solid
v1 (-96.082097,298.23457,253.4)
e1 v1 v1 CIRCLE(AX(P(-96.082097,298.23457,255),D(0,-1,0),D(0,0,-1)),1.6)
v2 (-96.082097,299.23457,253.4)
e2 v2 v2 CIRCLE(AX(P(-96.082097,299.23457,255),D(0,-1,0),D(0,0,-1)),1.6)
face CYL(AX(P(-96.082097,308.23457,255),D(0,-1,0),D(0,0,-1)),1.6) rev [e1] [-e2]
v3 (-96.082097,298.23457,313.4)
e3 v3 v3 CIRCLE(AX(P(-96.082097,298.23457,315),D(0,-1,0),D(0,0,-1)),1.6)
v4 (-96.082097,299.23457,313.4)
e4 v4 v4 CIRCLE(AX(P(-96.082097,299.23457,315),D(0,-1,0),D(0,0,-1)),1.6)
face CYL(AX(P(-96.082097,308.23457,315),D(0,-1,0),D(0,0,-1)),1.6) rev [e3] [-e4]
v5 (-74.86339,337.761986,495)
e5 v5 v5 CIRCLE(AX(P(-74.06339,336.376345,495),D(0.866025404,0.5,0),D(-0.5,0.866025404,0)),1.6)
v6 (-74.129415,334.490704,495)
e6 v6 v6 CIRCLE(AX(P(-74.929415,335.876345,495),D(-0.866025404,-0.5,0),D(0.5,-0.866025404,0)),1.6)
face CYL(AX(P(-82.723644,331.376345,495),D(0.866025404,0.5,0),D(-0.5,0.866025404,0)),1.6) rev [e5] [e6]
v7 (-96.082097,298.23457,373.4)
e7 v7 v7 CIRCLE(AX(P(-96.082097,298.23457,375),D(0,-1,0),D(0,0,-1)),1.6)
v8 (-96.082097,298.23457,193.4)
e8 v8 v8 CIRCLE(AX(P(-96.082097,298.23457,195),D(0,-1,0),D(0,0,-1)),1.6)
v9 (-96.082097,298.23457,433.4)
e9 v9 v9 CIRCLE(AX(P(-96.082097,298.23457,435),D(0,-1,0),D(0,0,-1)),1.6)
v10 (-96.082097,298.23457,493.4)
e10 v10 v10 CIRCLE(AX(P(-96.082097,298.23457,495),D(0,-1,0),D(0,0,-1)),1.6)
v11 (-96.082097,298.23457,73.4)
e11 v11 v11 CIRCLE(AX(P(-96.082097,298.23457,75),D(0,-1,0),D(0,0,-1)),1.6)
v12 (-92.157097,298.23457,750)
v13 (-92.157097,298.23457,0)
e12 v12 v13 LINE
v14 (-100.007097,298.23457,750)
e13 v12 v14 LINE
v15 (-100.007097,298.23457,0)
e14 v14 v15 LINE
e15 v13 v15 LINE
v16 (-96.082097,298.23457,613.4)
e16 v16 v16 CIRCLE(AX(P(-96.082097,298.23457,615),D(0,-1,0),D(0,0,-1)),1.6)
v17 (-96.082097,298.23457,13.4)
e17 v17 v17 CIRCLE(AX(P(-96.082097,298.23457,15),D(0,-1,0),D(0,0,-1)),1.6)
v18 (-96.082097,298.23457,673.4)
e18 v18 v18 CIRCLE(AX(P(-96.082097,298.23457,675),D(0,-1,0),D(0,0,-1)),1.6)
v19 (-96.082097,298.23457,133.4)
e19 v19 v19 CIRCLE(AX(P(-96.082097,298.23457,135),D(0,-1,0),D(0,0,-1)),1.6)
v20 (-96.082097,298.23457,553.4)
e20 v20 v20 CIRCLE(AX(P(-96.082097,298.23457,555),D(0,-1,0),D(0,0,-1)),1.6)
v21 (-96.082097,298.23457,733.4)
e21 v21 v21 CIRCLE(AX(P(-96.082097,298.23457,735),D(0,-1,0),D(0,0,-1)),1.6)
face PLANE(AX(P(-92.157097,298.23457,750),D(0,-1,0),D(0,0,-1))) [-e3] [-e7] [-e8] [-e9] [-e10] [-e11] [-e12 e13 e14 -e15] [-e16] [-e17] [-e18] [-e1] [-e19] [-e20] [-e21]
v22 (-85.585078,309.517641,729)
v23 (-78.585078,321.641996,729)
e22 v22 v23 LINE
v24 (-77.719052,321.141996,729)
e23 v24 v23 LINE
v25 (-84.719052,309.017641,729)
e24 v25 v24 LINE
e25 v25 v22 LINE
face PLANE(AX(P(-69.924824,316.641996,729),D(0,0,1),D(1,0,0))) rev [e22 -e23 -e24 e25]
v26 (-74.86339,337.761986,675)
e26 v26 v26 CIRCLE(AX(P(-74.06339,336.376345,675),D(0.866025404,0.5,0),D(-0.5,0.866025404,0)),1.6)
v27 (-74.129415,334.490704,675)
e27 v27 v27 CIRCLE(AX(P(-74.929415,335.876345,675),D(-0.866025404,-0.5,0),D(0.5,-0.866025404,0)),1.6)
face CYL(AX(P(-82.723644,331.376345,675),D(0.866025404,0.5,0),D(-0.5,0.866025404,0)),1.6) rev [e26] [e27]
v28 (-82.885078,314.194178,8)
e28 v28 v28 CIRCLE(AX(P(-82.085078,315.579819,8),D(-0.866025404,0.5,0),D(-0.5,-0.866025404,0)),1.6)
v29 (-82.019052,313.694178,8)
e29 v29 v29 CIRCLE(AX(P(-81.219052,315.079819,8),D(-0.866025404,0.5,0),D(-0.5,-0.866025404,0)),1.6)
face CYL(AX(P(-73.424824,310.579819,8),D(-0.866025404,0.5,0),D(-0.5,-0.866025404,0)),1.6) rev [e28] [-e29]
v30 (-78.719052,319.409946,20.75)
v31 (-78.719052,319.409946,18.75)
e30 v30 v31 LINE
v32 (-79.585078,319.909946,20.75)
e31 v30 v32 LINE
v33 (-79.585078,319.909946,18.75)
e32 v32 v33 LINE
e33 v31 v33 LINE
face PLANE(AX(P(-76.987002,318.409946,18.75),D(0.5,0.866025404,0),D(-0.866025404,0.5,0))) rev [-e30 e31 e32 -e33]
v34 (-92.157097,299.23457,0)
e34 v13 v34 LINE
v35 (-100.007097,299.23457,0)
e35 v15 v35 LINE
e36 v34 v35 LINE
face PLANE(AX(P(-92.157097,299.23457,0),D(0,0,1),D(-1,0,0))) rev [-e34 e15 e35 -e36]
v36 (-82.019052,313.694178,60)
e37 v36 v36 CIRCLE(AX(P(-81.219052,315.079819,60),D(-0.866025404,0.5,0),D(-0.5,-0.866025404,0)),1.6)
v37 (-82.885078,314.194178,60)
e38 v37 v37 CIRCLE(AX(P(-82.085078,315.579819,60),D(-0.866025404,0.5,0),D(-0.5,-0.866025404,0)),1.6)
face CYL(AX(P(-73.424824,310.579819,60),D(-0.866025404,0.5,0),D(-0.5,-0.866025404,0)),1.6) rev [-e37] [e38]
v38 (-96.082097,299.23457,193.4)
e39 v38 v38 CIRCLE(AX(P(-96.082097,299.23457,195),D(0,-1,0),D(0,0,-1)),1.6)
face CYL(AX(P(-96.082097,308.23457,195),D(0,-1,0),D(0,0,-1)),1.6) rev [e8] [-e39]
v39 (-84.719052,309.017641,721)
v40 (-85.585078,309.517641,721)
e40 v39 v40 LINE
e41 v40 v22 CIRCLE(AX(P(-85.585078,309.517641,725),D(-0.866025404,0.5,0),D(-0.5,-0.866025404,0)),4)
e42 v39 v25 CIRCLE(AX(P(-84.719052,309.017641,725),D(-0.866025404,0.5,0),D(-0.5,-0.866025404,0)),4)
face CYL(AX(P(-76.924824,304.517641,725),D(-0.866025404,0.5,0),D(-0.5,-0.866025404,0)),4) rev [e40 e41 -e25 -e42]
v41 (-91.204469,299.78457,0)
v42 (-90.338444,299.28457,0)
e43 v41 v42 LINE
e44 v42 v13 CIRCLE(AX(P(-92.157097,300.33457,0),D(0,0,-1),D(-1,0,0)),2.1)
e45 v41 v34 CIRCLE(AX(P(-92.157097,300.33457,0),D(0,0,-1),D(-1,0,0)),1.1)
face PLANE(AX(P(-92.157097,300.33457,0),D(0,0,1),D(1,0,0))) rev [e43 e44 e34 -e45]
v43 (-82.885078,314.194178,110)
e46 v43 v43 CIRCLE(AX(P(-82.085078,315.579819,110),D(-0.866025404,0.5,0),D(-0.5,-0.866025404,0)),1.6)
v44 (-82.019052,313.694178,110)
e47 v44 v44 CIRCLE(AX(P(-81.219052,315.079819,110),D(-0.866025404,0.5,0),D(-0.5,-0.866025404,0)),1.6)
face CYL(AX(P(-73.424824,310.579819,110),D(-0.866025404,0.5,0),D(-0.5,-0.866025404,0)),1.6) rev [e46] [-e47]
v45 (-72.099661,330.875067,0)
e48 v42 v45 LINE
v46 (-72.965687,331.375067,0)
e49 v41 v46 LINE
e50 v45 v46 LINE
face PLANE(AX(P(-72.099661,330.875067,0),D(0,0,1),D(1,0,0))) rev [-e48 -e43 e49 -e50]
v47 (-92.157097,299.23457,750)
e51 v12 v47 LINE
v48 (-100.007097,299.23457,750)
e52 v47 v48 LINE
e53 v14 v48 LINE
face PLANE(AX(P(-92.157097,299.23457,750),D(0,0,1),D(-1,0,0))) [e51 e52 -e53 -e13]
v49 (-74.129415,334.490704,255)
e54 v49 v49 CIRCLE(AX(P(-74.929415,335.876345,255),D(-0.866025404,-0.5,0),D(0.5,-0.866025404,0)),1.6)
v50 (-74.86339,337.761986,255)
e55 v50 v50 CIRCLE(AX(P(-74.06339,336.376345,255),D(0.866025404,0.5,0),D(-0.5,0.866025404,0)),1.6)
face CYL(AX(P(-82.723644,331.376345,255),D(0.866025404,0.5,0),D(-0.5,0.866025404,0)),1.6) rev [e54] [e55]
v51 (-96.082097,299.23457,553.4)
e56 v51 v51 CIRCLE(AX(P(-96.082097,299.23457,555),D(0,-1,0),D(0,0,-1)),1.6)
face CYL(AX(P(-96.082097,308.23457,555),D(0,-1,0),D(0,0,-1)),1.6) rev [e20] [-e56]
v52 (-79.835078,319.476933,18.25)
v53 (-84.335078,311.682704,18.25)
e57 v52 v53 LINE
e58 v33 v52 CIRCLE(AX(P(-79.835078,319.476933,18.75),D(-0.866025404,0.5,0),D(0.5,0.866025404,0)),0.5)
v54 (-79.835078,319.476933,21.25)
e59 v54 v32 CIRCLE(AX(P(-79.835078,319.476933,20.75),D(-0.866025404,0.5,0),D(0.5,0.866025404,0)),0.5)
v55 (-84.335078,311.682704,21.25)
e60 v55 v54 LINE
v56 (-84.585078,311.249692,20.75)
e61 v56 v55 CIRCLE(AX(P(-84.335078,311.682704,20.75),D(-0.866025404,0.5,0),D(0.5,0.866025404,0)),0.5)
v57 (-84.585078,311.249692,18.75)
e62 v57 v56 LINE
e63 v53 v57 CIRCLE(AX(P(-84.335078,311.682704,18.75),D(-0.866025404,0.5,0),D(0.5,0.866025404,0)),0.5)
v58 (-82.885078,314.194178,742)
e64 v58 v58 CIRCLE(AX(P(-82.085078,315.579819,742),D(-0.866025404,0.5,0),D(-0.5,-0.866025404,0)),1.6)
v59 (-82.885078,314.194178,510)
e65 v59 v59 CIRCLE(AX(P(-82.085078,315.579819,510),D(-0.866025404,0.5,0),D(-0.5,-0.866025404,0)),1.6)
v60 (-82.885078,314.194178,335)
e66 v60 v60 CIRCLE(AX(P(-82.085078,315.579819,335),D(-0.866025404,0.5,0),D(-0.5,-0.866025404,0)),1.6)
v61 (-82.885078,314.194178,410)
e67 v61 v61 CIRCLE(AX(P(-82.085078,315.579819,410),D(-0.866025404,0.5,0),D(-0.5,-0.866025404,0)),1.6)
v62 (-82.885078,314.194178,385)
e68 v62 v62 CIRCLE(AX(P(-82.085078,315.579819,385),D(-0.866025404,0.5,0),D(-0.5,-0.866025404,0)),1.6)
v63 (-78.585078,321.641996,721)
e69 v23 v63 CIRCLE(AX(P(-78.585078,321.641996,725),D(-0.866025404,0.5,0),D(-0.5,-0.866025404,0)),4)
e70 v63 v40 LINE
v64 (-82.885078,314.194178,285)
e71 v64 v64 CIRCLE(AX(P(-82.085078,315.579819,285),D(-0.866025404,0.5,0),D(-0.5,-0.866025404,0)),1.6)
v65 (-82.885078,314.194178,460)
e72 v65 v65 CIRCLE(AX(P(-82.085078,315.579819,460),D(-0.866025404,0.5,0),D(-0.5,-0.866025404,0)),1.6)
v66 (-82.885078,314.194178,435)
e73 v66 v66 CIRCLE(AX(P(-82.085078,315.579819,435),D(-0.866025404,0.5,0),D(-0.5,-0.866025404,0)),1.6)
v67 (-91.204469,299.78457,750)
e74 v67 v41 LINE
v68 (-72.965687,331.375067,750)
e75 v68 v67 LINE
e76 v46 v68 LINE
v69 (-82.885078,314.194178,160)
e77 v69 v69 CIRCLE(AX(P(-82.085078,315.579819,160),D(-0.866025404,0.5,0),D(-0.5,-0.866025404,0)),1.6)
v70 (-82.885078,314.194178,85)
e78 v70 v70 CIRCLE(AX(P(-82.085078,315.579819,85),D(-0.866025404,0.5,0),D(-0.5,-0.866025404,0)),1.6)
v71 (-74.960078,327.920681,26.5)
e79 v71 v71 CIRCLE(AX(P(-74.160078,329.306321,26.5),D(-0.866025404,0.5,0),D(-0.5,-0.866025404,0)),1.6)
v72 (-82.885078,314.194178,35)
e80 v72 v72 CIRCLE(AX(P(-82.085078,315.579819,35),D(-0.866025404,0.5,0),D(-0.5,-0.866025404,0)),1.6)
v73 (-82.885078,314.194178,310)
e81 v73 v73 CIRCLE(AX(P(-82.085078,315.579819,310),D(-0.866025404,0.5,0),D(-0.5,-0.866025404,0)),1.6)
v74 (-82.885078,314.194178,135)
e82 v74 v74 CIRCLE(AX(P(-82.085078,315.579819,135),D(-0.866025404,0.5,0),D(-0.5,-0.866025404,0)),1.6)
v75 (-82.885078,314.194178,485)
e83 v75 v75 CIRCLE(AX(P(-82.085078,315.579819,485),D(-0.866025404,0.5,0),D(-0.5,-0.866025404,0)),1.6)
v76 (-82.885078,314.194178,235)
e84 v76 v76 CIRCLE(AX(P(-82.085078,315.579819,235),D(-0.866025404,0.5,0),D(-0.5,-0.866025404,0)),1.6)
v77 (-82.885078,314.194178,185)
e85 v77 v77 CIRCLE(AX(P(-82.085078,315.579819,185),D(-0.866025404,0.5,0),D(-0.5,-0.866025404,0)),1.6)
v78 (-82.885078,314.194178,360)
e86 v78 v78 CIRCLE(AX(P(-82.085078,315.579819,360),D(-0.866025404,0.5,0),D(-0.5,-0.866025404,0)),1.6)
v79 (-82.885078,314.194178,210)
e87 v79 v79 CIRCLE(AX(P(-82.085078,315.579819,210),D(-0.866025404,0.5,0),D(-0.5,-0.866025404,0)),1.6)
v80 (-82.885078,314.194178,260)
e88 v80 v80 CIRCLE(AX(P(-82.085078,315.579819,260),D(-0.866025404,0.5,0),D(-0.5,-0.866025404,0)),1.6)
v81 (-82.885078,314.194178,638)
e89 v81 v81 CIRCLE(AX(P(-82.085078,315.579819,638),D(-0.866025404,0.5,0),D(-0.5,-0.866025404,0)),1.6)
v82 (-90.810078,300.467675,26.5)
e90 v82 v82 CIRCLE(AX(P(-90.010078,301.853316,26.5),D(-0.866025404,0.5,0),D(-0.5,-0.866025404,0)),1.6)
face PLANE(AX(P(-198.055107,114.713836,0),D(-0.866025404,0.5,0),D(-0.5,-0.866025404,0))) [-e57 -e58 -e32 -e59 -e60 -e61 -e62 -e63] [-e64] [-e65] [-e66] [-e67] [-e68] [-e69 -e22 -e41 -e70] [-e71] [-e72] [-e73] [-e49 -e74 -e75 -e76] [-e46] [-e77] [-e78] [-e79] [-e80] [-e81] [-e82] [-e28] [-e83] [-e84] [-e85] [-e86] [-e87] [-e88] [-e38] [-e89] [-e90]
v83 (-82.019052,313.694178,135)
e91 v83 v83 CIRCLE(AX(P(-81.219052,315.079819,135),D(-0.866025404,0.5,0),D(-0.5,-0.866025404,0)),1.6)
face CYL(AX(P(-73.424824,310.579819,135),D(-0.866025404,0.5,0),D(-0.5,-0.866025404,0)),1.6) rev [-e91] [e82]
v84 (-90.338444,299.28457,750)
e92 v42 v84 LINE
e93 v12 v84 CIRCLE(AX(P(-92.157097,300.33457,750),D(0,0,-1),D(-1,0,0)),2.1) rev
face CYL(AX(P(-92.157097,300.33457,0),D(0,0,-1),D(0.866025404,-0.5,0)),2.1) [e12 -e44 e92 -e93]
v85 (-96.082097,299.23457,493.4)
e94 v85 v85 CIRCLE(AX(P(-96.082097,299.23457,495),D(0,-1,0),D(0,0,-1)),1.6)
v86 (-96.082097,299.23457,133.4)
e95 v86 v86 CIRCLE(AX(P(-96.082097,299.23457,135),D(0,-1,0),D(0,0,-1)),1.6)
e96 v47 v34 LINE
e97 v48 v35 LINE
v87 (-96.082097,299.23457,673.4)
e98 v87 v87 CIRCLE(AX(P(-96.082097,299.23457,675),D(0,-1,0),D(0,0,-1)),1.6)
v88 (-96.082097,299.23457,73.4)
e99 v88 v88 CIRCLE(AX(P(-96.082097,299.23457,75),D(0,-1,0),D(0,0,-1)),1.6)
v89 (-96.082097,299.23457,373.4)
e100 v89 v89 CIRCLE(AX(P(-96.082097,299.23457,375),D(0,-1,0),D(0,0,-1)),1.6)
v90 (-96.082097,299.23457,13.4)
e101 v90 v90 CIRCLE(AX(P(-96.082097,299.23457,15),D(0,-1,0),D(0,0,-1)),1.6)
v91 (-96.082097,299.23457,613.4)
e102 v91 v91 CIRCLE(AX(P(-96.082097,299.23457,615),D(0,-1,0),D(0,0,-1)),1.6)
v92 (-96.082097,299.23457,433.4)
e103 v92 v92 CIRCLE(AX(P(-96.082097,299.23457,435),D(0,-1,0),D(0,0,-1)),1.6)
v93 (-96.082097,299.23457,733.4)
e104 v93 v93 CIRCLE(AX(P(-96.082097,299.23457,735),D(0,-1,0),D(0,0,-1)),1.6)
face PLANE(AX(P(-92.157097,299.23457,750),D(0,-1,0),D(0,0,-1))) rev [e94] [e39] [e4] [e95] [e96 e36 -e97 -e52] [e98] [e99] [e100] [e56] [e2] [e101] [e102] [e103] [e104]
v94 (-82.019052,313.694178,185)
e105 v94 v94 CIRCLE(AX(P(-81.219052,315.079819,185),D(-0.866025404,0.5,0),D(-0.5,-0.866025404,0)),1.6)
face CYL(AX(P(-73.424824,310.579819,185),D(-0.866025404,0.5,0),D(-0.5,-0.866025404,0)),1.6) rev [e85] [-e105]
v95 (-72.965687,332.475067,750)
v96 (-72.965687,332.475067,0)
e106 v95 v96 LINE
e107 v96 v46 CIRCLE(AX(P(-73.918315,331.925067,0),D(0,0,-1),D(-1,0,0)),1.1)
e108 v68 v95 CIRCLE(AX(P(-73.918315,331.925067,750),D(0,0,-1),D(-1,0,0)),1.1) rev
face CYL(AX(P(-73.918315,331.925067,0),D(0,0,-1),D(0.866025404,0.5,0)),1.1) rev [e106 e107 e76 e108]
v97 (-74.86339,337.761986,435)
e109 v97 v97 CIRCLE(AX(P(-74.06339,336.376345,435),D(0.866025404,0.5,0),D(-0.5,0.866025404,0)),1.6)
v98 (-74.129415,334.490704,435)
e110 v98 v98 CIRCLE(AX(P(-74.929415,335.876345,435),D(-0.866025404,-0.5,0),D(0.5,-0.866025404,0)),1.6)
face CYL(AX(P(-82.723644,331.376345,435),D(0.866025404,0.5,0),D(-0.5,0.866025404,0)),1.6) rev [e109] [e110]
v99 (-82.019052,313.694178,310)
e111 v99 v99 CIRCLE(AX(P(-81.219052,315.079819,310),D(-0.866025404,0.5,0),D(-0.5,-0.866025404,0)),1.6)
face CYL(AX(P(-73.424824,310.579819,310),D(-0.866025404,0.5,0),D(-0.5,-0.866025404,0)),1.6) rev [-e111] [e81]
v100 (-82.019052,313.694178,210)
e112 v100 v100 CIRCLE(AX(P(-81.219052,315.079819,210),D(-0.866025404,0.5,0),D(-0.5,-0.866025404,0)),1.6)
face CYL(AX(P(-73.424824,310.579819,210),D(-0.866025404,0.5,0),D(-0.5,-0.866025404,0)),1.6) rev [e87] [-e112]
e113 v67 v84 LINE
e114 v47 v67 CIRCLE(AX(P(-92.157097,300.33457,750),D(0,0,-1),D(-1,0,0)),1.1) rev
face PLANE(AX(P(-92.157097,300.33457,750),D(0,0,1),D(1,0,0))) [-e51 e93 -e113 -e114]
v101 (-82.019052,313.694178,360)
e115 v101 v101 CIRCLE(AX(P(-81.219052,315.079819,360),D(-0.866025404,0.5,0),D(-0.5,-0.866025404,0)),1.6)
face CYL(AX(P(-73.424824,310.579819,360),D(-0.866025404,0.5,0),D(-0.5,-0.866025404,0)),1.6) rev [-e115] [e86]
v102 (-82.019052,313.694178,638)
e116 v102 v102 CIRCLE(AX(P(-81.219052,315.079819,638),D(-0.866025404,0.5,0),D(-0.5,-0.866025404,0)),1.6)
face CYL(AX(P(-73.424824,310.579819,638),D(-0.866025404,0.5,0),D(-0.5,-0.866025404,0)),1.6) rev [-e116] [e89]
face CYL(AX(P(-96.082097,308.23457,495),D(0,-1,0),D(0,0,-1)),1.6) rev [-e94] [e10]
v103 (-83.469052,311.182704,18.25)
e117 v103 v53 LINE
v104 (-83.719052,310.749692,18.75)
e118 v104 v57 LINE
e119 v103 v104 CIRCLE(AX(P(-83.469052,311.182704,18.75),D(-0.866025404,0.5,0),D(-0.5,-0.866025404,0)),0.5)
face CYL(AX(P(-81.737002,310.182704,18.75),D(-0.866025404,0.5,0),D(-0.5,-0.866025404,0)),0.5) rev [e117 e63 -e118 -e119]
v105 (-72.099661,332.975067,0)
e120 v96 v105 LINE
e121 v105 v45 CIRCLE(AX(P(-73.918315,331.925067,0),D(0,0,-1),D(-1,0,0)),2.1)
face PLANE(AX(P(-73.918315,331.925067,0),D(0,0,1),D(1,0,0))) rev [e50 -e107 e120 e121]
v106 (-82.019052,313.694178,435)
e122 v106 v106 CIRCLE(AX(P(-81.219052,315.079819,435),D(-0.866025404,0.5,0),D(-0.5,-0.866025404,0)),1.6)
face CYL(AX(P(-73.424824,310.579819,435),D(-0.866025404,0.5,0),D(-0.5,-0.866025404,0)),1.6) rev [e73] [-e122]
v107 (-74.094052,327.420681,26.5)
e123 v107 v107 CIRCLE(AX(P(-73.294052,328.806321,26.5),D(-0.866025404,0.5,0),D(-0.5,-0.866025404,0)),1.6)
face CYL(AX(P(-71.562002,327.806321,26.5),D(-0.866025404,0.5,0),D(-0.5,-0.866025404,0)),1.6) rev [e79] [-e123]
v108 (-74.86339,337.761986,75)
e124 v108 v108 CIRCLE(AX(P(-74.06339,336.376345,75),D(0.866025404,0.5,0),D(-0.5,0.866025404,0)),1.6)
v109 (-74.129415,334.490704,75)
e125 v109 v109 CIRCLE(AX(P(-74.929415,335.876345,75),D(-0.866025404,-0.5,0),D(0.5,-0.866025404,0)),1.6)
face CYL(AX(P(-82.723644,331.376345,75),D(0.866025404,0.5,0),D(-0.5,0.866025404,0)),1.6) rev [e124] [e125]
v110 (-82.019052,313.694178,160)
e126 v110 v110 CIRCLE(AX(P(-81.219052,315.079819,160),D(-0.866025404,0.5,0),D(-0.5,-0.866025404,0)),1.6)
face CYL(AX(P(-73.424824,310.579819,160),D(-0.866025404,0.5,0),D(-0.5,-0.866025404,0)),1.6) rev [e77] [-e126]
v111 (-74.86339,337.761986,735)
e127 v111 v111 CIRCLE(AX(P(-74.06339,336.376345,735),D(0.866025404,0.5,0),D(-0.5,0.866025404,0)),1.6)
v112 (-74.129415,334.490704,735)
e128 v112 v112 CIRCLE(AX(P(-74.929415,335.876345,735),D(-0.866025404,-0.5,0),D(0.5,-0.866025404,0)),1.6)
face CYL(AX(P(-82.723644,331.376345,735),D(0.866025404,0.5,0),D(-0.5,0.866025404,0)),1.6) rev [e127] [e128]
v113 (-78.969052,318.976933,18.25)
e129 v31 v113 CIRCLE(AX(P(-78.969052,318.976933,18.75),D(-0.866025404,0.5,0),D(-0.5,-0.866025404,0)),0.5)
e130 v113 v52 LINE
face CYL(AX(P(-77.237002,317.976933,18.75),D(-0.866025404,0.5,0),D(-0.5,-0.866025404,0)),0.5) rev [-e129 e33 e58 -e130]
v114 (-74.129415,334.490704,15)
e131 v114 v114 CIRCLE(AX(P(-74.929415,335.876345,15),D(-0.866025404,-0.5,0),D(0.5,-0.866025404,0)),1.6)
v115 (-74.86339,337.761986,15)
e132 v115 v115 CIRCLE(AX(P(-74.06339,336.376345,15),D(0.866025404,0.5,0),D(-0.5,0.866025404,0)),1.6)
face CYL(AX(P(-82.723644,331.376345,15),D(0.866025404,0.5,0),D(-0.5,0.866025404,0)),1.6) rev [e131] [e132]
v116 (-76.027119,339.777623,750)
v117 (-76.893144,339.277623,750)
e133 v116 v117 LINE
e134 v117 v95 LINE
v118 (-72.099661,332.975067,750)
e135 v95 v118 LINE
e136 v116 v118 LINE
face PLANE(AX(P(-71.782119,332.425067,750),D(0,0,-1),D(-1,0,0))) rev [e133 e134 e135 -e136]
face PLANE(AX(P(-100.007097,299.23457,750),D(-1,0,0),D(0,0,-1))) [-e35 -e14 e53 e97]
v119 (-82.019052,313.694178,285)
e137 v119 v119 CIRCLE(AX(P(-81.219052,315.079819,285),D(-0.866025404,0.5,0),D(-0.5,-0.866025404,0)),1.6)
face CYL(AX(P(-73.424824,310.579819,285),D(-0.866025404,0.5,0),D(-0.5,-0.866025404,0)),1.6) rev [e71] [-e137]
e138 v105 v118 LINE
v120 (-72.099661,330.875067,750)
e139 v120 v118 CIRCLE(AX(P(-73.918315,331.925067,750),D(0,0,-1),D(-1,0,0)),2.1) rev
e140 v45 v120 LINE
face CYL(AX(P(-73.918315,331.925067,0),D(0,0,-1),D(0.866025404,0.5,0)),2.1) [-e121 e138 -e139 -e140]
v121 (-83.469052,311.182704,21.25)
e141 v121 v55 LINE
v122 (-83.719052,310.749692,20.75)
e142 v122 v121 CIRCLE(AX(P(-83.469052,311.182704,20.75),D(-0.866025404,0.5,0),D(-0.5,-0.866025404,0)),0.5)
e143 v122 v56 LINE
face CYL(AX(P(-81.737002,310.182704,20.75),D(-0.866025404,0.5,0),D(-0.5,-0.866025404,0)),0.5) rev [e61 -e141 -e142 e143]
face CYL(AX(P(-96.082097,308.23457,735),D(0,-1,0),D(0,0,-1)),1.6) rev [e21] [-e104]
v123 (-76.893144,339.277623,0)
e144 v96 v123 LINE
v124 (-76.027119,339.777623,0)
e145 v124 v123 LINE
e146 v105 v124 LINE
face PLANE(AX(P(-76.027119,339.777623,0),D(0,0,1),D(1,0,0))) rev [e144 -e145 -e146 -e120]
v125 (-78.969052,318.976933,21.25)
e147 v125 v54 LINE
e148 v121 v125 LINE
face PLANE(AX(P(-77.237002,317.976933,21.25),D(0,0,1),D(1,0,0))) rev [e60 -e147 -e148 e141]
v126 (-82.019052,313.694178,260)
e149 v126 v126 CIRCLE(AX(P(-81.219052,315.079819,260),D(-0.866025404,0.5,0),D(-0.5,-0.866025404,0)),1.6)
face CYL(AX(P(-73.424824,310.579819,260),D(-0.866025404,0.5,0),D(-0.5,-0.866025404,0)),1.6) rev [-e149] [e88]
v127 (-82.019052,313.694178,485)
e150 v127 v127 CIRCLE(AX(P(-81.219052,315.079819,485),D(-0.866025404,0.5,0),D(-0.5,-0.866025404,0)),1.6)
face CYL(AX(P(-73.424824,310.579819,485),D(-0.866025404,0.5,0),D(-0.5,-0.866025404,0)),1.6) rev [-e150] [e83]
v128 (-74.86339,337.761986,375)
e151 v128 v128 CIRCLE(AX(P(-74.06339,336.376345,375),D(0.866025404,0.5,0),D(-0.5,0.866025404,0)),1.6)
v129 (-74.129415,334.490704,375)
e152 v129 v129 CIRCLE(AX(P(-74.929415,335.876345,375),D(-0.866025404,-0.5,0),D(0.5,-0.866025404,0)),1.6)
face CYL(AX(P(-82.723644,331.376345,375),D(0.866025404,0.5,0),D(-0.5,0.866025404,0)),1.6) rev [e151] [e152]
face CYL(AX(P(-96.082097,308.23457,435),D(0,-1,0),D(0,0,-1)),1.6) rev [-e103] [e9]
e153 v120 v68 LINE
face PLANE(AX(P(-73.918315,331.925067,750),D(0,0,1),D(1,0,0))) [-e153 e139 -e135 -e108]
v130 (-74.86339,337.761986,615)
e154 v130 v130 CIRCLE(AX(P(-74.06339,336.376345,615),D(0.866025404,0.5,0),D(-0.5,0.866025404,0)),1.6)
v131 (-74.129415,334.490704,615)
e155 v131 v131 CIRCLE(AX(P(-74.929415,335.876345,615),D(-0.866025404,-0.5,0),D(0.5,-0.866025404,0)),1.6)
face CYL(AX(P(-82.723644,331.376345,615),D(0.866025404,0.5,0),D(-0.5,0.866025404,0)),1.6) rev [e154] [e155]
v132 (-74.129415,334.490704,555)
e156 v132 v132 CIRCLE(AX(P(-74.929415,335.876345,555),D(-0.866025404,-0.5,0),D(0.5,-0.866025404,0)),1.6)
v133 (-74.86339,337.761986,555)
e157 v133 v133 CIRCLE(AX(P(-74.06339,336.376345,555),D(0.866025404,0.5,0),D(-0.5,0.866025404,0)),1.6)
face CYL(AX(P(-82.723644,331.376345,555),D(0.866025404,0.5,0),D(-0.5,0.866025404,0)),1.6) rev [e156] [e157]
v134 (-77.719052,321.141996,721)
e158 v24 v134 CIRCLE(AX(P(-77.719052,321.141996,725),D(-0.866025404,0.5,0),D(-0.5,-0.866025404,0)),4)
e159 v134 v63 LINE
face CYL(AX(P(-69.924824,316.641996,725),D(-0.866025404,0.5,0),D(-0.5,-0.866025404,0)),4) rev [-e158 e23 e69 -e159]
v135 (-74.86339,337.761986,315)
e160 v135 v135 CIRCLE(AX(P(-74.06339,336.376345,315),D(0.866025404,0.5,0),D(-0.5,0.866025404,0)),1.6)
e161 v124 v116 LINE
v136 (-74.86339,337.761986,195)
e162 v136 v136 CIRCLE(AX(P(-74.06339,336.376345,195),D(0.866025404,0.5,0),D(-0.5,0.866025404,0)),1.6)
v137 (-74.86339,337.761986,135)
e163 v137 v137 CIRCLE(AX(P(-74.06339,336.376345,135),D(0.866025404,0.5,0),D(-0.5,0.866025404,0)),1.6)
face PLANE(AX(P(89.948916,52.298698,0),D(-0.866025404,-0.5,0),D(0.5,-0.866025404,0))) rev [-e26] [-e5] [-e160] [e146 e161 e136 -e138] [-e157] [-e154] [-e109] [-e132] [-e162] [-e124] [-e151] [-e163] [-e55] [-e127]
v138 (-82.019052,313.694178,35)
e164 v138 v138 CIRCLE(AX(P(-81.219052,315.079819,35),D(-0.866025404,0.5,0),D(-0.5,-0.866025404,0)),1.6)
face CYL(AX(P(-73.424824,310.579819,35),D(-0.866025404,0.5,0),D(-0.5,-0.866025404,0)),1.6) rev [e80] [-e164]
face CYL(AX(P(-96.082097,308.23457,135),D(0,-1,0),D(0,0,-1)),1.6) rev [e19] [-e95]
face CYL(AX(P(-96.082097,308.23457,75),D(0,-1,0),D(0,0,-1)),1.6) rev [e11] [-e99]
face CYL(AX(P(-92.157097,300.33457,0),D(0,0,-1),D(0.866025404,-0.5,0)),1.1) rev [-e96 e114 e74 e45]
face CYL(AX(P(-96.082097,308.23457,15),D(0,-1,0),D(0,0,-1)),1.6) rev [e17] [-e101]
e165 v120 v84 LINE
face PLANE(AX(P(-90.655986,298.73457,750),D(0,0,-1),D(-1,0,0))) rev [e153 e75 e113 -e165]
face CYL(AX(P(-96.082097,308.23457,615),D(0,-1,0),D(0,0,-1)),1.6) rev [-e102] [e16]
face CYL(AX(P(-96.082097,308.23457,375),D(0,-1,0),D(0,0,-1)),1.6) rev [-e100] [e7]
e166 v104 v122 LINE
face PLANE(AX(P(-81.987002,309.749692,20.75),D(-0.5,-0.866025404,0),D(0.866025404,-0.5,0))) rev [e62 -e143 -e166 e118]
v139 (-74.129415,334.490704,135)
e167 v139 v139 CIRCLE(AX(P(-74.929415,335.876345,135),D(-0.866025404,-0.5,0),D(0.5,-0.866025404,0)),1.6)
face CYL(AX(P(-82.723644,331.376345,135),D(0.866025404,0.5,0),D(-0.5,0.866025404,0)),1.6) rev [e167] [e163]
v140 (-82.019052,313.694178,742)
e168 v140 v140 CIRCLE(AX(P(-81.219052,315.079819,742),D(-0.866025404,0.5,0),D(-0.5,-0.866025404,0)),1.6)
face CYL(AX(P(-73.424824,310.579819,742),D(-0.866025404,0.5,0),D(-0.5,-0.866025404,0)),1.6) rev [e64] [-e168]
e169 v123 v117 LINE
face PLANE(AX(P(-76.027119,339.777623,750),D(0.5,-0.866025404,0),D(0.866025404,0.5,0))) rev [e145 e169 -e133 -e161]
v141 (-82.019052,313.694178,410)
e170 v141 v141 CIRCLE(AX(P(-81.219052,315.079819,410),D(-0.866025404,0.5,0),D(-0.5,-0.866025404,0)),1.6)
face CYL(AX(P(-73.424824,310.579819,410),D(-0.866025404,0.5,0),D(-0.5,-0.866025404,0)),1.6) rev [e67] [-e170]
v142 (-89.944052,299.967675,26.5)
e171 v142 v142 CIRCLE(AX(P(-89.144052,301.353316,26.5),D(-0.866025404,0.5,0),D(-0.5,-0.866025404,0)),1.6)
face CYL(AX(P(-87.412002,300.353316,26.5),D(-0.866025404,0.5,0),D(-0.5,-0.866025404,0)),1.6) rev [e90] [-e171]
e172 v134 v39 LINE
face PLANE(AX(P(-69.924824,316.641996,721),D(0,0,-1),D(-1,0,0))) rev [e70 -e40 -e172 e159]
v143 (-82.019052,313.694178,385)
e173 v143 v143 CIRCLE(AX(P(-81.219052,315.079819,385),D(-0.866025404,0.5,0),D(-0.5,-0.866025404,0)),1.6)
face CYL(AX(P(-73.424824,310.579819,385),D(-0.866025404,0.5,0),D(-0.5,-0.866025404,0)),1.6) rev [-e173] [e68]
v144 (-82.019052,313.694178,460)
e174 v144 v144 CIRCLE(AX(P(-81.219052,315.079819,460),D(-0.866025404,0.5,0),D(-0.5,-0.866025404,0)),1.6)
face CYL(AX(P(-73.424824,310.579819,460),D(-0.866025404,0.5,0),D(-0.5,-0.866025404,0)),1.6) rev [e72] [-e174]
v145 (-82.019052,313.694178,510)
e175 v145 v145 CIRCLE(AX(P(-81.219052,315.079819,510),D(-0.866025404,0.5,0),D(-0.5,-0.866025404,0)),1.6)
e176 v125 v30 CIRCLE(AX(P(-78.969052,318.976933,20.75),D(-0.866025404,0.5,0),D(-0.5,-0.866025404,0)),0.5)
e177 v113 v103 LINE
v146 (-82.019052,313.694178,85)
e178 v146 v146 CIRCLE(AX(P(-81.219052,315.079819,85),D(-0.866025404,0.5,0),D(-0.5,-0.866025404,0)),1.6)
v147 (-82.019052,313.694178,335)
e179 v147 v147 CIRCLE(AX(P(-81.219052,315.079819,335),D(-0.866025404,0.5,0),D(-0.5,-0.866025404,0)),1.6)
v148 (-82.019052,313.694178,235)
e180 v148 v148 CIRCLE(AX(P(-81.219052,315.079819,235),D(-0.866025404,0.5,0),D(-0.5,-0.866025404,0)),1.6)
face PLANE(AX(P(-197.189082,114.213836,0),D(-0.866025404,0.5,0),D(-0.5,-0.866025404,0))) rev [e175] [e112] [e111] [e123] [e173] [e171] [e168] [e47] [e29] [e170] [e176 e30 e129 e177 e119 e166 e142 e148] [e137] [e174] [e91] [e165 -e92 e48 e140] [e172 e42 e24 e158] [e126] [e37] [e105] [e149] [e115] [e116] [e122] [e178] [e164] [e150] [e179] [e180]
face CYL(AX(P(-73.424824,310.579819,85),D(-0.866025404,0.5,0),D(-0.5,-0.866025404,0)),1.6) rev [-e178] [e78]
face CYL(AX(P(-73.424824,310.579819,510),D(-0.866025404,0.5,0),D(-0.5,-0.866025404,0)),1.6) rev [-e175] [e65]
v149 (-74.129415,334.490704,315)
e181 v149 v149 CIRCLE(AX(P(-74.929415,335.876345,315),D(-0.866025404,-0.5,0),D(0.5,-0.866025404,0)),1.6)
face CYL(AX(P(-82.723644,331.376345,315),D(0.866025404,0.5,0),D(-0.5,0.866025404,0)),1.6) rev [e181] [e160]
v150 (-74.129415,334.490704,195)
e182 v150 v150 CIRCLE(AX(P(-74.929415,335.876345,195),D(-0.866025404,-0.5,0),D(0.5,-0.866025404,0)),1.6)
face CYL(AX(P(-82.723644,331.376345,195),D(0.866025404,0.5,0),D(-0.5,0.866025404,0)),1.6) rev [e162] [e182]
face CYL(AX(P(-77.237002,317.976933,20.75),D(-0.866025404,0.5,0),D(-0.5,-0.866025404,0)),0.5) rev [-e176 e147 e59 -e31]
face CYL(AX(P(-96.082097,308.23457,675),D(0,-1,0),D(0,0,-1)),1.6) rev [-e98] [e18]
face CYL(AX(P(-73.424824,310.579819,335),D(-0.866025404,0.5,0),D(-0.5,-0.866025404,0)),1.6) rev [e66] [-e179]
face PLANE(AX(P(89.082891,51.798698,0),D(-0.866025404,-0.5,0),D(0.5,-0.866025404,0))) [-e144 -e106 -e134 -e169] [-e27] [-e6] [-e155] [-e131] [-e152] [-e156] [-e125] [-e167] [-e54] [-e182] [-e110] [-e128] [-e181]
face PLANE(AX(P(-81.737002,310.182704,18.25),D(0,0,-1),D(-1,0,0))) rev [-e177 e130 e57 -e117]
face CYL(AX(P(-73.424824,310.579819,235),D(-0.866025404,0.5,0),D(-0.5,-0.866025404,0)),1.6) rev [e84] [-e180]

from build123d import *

# Parameters (mm, degrees)
SKETCH2_W           = 7.85
SKETCH2_H           = 1
BOSS_EXTRUDE2_DEPTH = 750
EDGE_FLANGE9_DEPTH  = 750
EDGE_FLANGE10_DEPTH = 750
SKETCH57_R          = 1.6
CUT_EXTRUDE2_DEPTH  = 10
SKETCH58_R          = 1.6
CUT_EXTRUDE3_DEPTH  = 10
SKETCH59_R          = 1.6
CUT_EXTRUDE4_DEPTH  = 10
SKETCH60_R          = 1.6
CUT_EXTRUDE5_DEPTH  = 3
CUT_EXTRUDE6_DEPTH  = 3
CUT_EXTRUDE7_DEPTH  = 10
SKETCH63_R          = 1.6
CUT_EXTRUDE8_DEPTH  = 10


# Sheet-metal steps are written as plain solids
with BuildPart() as part:
    # Sketch2 → Boss-Extrude2 (new body)
    with BuildSketch(Plane.XY):
        with Locations((-96.082096866, 298.73456983)):
            Rectangle(SKETCH2_W, SKETCH2_H)
    extrude(amount=BOSS_EXTRUDE2_DEPTH)

    # Edge-Flange9 section (across the edge) → Edge-Flange9 (add)
    with BuildSketch(Plane(origin=(-91.52201157, 299.23456983, 750), x_dir=(-0.8660254037844364, 0.5000000000000041, 0), z_dir=(0, 0, -1))):
        with BuildLine():
            Line((-1, 0.635085296), (-1, 37.112649731))
            Line((-1, 37.112649731), (0, 37.112649731))
            Line((0, 37.112649731), (0, 0.635085296))
            ThreePointArc((0, 0.635085296), (0.147372056, 0.085085296), (0.55, -0.317542648))
            Line((0.55, -0.317542648), (0.05, -1.183568052))
            ThreePointArc((0.05, -1.183568052), (-0.718653348, -0.414914704), (-1, 0.635085296))
        make_face()
    extrude(amount=EDGE_FLANGE9_DEPTH)

    # Edge-Flange10 section (across the edge) → Edge-Flange10 (add)
    with BuildSketch(Plane(origin=(-72.648144057, 331.925067298, 750), x_dir=(-0.8660254037844433, -0.49999999999999195, 0), z_dir=(0, 0, -1))):
        with BuildLine():
            Line((-1, 0.635085296), (-1, 8.49))
            Line((-1, 8.49), (0, 8.49))
            Line((0, 8.49), (0, 0.635085296))
            ThreePointArc((0, 0.635085296), (0.147372056, 0.085085296), (0.55, -0.317542648))
            Line((0.55, -0.317542648), (0.05, -1.183568052))
            ThreePointArc((0.05, -1.183568052), (-0.718653348, -0.414914704), (-1, 0.635085296))
        make_face()
    extrude(amount=EDGE_FLANGE10_DEPTH)

    # Sketch57 → Cut-Extrude2 (cut)
    with BuildSketch(Plane.XZ.offset(-298.23456983)):
        with Locations(Location((-96.082096866, 735, 0), (0, 0, 270))):
            Circle(SKETCH57_R)
        with Locations(Location((-96.082096866, 15, 0), (0, 0, 270))):
            Circle(SKETCH57_R)
        with Locations(Location((-96.082096866, 75, 0), (0, 0, 270))):
            Circle(SKETCH57_R)
        with Locations(Location((-96.082096866, 135, 0), (0, 0, 270))):
            Circle(SKETCH57_R)
        with Locations(Location((-96.082096866, 195, 0), (0, 0, 270))):
            Circle(SKETCH57_R)
        with Locations(Location((-96.082096866, 255, 0), (0, 0, 270))):
            Circle(SKETCH57_R)
        with Locations(Location((-96.082096866, 315, 0), (0, 0, 270))):
            Circle(SKETCH57_R)
        with Locations(Location((-96.082096866, 375, 0), (0, 0, 270))):
            Circle(SKETCH57_R)
        with Locations(Location((-96.082096866, 435, 0), (0, 0, 270))):
            Circle(SKETCH57_R)
        with Locations(Location((-96.082096866, 495, 0), (0, 0, 270))):
            Circle(SKETCH57_R)
        with Locations(Location((-96.082096866, 555, 0), (0, 0, 270))):
            Circle(SKETCH57_R)
        with Locations(Location((-96.082096866, 615, 0), (0, 0, 270))):
            Circle(SKETCH57_R)
        with Locations(Location((-96.082096866, 675, 0), (0, 0, 270))):
            Circle(SKETCH57_R)
    extrude(amount=-CUT_EXTRUDE2_DEPTH, mode=Mode.SUBTRACT)

    # Sketch58 → Cut-Extrude3 (cut)
    with BuildSketch(Plane(origin=(90.107687578, 52.023697679, 0), x_dir=(0, 0, -1), z_dir=(0.8660254037844434, 0.4999999999999918, 0))):
        with Locations(Location((-735, 328.34215511, 0), (0, 0, 90))):
            Circle(SKETCH58_R)
        with Locations(Location((-15, 328.34215511, 0), (0, 0, 90))):
            Circle(SKETCH58_R)
        with Locations(Location((-75, 328.34215511, 0), (0, 0, 90))):
            Circle(SKETCH58_R)
        with Locations(Location((-135, 328.34215511, 0), (0, 0, 90))):
            Circle(SKETCH58_R)
        with Locations(Location((-195, 328.34215511, 0), (0, 0, 90))):
            Circle(SKETCH58_R)
        with Locations(Location((-255, 328.34215511, 0), (0, 0, 90))):
            Circle(SKETCH58_R)
        with Locations(Location((-315, 328.34215511, 0), (0, 0, 90))):
            Circle(SKETCH58_R)
        with Locations(Location((-375, 328.34215511, 0), (0, 0, 90))):
            Circle(SKETCH58_R)
        with Locations(Location((-435, 328.34215511, 0), (0, 0, 90))):
            Circle(SKETCH58_R)
        with Locations(Location((-495, 328.34215511, 0), (0, 0, 90))):
            Circle(SKETCH58_R)
        with Locations(Location((-555, 328.34215511, 0), (0, 0, 90))):
            Circle(SKETCH58_R)
        with Locations(Location((-615, 328.34215511, 0), (0, 0, 90))):
            Circle(SKETCH58_R)
        with Locations(Location((-675, 328.34215511, 0), (0, 0, 90))):
            Circle(SKETCH58_R)
    extrude(amount=-CUT_EXTRUDE3_DEPTH, mode=Mode.SUBTRACT)

    # Sketch59 → Cut-Extrude4 (cut)
    with BuildSketch(Plane(origin=(-198.213878259, 114.43883597, 0), x_dir=(0, 0, 1), z_dir=(-0.8660254037844364, 0.5000000000000041, 0))):
        with Locations(Location((35, 232.257600891, 0), (0, 0, 270))):
            Circle(SKETCH59_R)
        with Locations(Location((60, 232.257600891, 0), (0, 0, 270))):
            Circle(SKETCH59_R)
        with Locations(Location((85, 232.257600891, 0), (0, 0, 270))):
            Circle(SKETCH59_R)
        with Locations(Location((110, 232.257600891, 0), (0, 0, 270))):
            Circle(SKETCH59_R)
        with Locations(Location((135, 232.257600891, 0), (0, 0, 270))):
            Circle(SKETCH59_R)
        with Locations(Location((160, 232.257600891, 0), (0, 0, 270))):
            Circle(SKETCH59_R)
        with Locations(Location((185, 232.257600891, 0), (0, 0, 270))):
            Circle(SKETCH59_R)
        with Locations(Location((210, 232.257600891, 0), (0, 0, 270))):
            Circle(SKETCH59_R)
        with Locations(Location((235, 232.257600891, 0), (0, 0, 270))):
            Circle(SKETCH59_R)
        with Locations(Location((260, 232.257600891, 0), (0, 0, 270))):
            Circle(SKETCH59_R)
        with Locations(Location((285, 232.257600891, 0), (0, 0, 270))):
            Circle(SKETCH59_R)
        with Locations(Location((310, 232.257600891, 0), (0, 0, 270))):
            Circle(SKETCH59_R)
        with Locations(Location((335, 232.257600891, 0), (0, 0, 270))):
            Circle(SKETCH59_R)
        with Locations(Location((360, 232.257600891, 0), (0, 0, 270))):
            Circle(SKETCH59_R)
        with Locations(Location((385, 232.257600891, 0), (0, 0, 270))):
            Circle(SKETCH59_R)
        with Locations(Location((410, 232.257600891, 0), (0, 0, 270))):
            Circle(SKETCH59_R)
        with Locations(Location((435, 232.257600891, 0), (0, 0, 270))):
            Circle(SKETCH59_R)
        with Locations(Location((460, 232.257600891, 0), (0, 0, 270))):
            Circle(SKETCH59_R)
        with Locations(Location((485, 232.257600891, 0), (0, 0, 270))):
            Circle(SKETCH59_R)
        with Locations(Location((510, 232.257600891, 0), (0, 0, 270))):
            Circle(SKETCH59_R)
    extrude(amount=-CUT_EXTRUDE4_DEPTH, mode=Mode.SUBTRACT)

    # Sketch60 → Cut-Extrude5 (cut)
    with BuildSketch(Plane(origin=(-198.213878259, 114.43883597, 0), x_dir=(0, 0, 1), z_dir=(-0.8660254037844364, 0.5000000000000041, 0))):
        with Locations(Location((26.5, 248.107600891, 0), (0, 0, 270))):
            Circle(SKETCH60_R)
        with Locations(Location((26.5, 216.407600891, 0), (0, 0, 270))):
            Circle(SKETCH60_R)
    extrude(amount=-CUT_EXTRUDE5_DEPTH, mode=Mode.SUBTRACT)

    # Sketch61 → Cut-Extrude6 (cut)
    with BuildSketch(Plane(origin=(-198.213878259, 114.43883597, 0), x_dir=(0, 0, 1), z_dir=(-0.8660254037844364, 0.5000000000000041, 0))):
        with BuildLine():
            Line((21.25, 236.757600891), (21.25, 227.757600891))
            ThreePointArc((21.25, 227.757600891), (21.103553391, 227.404047501), (20.75, 227.257600891))
            Line((20.75, 227.257600891), (18.75, 227.257600891))
            ThreePointArc((18.75, 227.257600891), (18.396446609, 227.404047501), (18.25, 227.757600891))
            Line((18.25, 227.757600891), (18.25, 236.757600891))
            ThreePointArc((18.25, 236.757600891), (18.396446609, 237.111154282), (18.75, 237.257600891))
            Line((18.75, 237.257600891), (20.75, 237.257600891))
            ThreePointArc((20.75, 237.257600891), (21.103553391, 237.111154282), (21.25, 236.757600891))
        make_face()
    extrude(amount=-CUT_EXTRUDE6_DEPTH, mode=Mode.SUBTRACT)

    # Sketch62 → Cut-Extrude7 (cut)
    with BuildSketch(Plane(origin=(-198.213878259, 114.43883597, 0), x_dir=(0, 0, 1), z_dir=(-0.8660254037844364, 0.5000000000000041, 0))):
        with BuildLine():
            Line((729, 239.257600891), (729, 225.257600891))
            ThreePointArc((729, 225.257600891), (725, 221.257600891), (721, 225.257600891))
            Line((721, 225.257600891), (721, 239.257600891))
            ThreePointArc((721, 239.257600891), (725, 243.257600891), (729, 239.257600891))
        make_face()
    extrude(amount=-CUT_EXTRUDE7_DEPTH, mode=Mode.SUBTRACT)

    # Sketch63 → Cut-Extrude8 (cut)
    with BuildSketch(Plane(origin=(-198.213878259, 114.43883597, 0), x_dir=(0, 0, 1), z_dir=(-0.8660254037844364, 0.5000000000000041, 0))):
        with Locations(Location((8, 232.257600891, 0), (0, 0, 270))):
            Circle(SKETCH63_R)
        with Locations(Location((638, 232.257600891, 0), (0, 0, 270))):
            Circle(SKETCH63_R)
        with Locations(Location((742, 232.257600891, 0), (0, 0, 270))):
            Circle(SKETCH63_R)
    extrude(amount=-CUT_EXTRUDE8_DEPTH, mode=Mode.SUBTRACT)


solid = part.part
